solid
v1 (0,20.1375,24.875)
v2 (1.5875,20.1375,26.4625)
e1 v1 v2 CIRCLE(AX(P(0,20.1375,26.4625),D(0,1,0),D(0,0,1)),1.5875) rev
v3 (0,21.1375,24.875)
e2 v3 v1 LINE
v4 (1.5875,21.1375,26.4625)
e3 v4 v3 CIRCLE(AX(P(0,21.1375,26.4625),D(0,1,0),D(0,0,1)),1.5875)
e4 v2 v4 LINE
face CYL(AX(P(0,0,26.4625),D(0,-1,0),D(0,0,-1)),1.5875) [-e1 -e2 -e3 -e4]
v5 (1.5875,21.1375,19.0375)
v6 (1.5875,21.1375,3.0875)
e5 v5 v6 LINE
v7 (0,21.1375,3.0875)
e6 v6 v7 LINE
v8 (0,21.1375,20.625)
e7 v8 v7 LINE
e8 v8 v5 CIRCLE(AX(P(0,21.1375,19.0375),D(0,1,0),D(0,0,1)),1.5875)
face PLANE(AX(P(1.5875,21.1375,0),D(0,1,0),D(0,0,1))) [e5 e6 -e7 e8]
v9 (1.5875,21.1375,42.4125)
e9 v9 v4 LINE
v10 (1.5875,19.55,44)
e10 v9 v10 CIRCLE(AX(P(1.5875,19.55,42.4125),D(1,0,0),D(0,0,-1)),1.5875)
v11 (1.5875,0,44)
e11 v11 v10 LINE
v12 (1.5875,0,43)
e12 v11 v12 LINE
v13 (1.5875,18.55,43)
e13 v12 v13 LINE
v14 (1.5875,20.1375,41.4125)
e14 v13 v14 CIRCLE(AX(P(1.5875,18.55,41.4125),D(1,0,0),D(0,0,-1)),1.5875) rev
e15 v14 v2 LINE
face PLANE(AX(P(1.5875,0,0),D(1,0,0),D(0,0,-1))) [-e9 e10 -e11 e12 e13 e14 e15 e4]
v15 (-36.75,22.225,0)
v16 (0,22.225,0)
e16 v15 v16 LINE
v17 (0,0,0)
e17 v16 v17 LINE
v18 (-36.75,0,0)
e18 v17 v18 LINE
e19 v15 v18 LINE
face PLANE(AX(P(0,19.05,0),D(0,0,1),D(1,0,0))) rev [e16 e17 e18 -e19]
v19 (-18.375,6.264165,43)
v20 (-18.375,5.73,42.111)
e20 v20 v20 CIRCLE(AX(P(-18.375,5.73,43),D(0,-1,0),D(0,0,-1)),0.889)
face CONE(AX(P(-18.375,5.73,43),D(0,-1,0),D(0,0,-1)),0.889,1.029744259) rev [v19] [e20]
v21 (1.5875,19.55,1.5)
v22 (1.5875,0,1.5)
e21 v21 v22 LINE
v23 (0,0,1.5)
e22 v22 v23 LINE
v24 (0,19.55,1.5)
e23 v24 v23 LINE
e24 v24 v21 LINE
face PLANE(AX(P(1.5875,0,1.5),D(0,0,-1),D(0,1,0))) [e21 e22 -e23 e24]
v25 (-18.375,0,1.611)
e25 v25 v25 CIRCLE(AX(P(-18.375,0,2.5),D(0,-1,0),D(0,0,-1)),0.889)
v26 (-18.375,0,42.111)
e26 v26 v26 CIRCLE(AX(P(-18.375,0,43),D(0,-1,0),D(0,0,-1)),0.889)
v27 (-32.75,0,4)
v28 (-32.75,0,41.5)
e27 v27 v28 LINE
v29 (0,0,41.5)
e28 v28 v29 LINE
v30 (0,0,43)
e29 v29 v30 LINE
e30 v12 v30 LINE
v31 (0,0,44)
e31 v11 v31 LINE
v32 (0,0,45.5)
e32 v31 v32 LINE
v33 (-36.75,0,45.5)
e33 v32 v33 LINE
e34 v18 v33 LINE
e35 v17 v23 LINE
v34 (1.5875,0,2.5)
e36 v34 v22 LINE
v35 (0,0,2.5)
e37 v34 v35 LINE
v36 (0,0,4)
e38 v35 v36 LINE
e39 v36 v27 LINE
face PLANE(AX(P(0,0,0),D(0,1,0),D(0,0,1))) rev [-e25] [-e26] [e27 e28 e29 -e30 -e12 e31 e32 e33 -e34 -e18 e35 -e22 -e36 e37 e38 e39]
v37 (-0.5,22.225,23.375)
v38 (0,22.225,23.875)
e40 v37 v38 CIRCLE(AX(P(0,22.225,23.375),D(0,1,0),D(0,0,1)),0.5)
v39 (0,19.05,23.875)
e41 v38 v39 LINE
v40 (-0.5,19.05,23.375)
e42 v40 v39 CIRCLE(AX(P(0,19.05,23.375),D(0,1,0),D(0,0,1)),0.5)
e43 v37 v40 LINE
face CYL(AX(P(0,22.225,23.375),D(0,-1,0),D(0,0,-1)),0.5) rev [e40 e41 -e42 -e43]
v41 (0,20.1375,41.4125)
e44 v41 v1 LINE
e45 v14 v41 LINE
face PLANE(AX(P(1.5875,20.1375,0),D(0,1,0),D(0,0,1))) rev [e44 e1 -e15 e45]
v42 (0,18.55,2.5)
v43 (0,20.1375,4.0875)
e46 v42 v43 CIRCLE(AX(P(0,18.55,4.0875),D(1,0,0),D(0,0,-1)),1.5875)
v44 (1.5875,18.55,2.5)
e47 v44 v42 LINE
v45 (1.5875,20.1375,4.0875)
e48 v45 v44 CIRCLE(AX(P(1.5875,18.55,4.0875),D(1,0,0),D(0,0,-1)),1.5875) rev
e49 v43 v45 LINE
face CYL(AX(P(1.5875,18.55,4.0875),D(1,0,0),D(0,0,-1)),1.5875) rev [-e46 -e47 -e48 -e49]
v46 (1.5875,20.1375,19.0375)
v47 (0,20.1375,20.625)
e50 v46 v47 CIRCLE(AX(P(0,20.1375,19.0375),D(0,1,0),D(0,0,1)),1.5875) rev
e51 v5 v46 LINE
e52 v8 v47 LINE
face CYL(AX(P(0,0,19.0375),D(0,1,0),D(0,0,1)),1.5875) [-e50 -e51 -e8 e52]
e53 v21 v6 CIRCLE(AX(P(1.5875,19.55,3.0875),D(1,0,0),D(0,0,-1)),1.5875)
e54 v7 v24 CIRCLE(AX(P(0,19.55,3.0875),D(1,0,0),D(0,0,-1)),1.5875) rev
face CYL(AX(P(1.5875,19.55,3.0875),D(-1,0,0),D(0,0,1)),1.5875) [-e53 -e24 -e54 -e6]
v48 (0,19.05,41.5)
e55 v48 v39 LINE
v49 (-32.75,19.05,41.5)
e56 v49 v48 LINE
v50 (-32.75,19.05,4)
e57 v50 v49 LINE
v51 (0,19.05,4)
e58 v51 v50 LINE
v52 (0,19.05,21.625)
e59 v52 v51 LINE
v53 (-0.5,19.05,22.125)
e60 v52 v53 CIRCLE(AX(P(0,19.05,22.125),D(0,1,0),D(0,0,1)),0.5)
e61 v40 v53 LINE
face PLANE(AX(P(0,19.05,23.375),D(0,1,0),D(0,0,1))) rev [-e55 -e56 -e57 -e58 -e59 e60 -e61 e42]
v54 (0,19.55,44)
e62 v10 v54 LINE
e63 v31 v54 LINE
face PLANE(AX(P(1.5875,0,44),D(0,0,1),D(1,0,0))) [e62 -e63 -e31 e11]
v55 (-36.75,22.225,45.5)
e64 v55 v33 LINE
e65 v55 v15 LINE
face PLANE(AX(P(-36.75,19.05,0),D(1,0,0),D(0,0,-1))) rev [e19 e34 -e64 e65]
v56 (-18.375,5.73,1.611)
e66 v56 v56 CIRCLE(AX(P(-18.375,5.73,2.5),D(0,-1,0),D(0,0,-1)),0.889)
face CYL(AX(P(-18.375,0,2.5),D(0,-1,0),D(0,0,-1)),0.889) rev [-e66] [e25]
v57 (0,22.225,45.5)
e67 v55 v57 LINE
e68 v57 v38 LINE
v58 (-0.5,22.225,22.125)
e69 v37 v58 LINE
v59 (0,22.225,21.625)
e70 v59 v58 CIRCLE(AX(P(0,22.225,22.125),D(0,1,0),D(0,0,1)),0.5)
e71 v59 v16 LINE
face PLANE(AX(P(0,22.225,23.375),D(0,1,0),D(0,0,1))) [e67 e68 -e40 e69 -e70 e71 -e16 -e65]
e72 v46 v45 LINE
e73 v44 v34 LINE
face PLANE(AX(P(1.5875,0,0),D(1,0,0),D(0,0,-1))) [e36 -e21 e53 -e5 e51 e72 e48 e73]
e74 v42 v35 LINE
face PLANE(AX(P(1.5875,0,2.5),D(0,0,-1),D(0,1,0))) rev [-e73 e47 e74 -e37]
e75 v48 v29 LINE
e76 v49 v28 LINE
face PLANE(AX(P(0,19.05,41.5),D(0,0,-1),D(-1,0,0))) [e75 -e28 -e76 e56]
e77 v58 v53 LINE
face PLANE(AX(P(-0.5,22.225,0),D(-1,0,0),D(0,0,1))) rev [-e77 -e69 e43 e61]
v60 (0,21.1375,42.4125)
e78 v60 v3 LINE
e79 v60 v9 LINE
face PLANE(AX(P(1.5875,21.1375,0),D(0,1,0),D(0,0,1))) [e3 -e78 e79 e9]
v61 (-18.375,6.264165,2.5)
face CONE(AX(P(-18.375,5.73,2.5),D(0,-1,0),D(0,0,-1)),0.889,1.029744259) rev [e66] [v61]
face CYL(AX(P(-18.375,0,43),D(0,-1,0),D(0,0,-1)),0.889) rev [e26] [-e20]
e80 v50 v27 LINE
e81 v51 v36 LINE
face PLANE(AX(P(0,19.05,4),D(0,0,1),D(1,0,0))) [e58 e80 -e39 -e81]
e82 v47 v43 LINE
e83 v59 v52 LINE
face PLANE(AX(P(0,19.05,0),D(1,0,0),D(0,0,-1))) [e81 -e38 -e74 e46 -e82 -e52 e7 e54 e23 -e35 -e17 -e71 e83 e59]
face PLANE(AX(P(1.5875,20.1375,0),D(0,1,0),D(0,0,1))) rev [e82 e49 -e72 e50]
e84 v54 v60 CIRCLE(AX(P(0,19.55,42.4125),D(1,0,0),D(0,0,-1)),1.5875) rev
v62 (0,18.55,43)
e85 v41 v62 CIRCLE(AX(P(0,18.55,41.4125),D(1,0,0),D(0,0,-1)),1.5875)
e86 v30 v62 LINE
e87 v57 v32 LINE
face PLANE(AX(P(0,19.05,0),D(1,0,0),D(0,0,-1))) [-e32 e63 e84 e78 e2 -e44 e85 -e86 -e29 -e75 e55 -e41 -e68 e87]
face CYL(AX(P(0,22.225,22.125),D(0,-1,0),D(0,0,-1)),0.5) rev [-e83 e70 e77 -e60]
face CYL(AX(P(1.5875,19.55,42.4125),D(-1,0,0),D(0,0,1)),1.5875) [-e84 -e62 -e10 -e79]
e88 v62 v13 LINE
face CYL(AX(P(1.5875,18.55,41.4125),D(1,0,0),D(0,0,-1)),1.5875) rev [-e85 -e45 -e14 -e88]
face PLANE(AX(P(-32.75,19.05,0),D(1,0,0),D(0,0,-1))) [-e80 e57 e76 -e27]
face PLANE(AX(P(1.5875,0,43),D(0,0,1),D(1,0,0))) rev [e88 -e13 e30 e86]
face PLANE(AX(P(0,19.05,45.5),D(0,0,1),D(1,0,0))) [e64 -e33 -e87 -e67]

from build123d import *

# Parameters (mm, degrees)
WALL_DEPTH                = 19.05
ROOF_START                = 19.05
ROOF_DEPTH                = 3.175
F_2_56_TAPPED_HOLE1_D     = 1.778
F_2_56_TAPPED_HOLE1_DEPTH = 5.73
F_2_56_TAPPED_HOLE1_TIP   = 0.53416509
BOSS_EXTRUDE1_DEPTH       = 1.5875
FILLET1_R                 = 1.5875


with BuildPart() as part:
    # MainSketch → Wall (new body)
    with BuildSketch(Plane(origin=(0, 0, 0), x_dir=(1, 0, 0), z_dir=(0, 1, 0))):
        Polygon((-32.75, -4), (0, -4), (0, 0), (-36.75, 0), (-36.75, -45.5), (0, -45.5), (0, -41.5), (-32.75, -41.5), align=None)
    extrude(amount=WALL_DEPTH)

    # MainSketch<3> → Roof (add)
    with BuildSketch(Plane(origin=(0, 0, 0), x_dir=(1, 0, 0), z_dir=(0, 1, 0)).offset(ROOF_START)):
        with BuildLine():
            Line((0, -21.625), (0, 0))
            Line((0, 0), (-36.75, 0))
            Line((-36.75, 0), (-36.75, -45.5))
            Line((-36.75, -45.5), (0, -45.5))
            Line((0, -45.5), (0, -23.875))
            ThreePointArc((0, -23.875), (-0.353553391, -23.728553391), (-0.5, -23.375))
            Line((-0.5, -23.375), (-0.5, -22.125))
            ThreePointArc((-0.5, -22.125), (-0.353553391, -21.771446609), (0, -21.625))
        make_face()
    extrude(amount=ROOF_DEPTH)

    # #2-56 Tapped Hole1
    with Locations(Plane(origin=(-18.375, 0, 43), x_dir=(0, 0, -1), z_dir=(0, -1, 0))):
        with Locations((0, 0), (40.5, 0)):
            Hole(F_2_56_TAPPED_HOLE1_D / 2, depth=F_2_56_TAPPED_HOLE1_DEPTH)
            with Locations((0, 0, -(F_2_56_TAPPED_HOLE1_DEPTH + F_2_56_TAPPED_HOLE1_TIP / 2))):  # 118° drill point
                Cone(0, F_2_56_TAPPED_HOLE1_D / 2, F_2_56_TAPPED_HOLE1_TIP, mode=Mode.SUBTRACT)

    # Sketch3 → Boss-Extrude1 (add)
    with BuildSketch(Plane(origin=(0, 0, 0), x_dir=(0, 0, -1), z_dir=(1, 0, 0))):
        Polygon((-44, 21.1375), (-44, 0), (-43, 0), (-43, 20.1375), (-24.875, 20.1375), (-24.875, 21.1375), align=None)
        Polygon((-1.5, 21.1375), (-20.625, 21.1375), (-20.625, 20.1375), (-2.5, 20.1375), (-2.5, 0), (-1.5, 0), align=None)
    extrude(amount=BOSS_EXTRUDE1_DEPTH)

    # Fillet1
    fillet1_edges = [part.edges().sort_by_distance(p)[0] for p in [
        (0.79375, 20.1375, 43),
        (0.79375, 21.1375, 44),
        (0.79375, 20.1375, 2.5),
        (0.79375, 21.1375, 1.5),
        (1.5875, 20.6375, 20.625),
        (1.5875, 20.6375, 24.875),
    ]]
    fillet(fillet1_edges, radius=FILLET1_R - 0.0001)  # a hair under: the kernel refuses the full size


solid = part.part
